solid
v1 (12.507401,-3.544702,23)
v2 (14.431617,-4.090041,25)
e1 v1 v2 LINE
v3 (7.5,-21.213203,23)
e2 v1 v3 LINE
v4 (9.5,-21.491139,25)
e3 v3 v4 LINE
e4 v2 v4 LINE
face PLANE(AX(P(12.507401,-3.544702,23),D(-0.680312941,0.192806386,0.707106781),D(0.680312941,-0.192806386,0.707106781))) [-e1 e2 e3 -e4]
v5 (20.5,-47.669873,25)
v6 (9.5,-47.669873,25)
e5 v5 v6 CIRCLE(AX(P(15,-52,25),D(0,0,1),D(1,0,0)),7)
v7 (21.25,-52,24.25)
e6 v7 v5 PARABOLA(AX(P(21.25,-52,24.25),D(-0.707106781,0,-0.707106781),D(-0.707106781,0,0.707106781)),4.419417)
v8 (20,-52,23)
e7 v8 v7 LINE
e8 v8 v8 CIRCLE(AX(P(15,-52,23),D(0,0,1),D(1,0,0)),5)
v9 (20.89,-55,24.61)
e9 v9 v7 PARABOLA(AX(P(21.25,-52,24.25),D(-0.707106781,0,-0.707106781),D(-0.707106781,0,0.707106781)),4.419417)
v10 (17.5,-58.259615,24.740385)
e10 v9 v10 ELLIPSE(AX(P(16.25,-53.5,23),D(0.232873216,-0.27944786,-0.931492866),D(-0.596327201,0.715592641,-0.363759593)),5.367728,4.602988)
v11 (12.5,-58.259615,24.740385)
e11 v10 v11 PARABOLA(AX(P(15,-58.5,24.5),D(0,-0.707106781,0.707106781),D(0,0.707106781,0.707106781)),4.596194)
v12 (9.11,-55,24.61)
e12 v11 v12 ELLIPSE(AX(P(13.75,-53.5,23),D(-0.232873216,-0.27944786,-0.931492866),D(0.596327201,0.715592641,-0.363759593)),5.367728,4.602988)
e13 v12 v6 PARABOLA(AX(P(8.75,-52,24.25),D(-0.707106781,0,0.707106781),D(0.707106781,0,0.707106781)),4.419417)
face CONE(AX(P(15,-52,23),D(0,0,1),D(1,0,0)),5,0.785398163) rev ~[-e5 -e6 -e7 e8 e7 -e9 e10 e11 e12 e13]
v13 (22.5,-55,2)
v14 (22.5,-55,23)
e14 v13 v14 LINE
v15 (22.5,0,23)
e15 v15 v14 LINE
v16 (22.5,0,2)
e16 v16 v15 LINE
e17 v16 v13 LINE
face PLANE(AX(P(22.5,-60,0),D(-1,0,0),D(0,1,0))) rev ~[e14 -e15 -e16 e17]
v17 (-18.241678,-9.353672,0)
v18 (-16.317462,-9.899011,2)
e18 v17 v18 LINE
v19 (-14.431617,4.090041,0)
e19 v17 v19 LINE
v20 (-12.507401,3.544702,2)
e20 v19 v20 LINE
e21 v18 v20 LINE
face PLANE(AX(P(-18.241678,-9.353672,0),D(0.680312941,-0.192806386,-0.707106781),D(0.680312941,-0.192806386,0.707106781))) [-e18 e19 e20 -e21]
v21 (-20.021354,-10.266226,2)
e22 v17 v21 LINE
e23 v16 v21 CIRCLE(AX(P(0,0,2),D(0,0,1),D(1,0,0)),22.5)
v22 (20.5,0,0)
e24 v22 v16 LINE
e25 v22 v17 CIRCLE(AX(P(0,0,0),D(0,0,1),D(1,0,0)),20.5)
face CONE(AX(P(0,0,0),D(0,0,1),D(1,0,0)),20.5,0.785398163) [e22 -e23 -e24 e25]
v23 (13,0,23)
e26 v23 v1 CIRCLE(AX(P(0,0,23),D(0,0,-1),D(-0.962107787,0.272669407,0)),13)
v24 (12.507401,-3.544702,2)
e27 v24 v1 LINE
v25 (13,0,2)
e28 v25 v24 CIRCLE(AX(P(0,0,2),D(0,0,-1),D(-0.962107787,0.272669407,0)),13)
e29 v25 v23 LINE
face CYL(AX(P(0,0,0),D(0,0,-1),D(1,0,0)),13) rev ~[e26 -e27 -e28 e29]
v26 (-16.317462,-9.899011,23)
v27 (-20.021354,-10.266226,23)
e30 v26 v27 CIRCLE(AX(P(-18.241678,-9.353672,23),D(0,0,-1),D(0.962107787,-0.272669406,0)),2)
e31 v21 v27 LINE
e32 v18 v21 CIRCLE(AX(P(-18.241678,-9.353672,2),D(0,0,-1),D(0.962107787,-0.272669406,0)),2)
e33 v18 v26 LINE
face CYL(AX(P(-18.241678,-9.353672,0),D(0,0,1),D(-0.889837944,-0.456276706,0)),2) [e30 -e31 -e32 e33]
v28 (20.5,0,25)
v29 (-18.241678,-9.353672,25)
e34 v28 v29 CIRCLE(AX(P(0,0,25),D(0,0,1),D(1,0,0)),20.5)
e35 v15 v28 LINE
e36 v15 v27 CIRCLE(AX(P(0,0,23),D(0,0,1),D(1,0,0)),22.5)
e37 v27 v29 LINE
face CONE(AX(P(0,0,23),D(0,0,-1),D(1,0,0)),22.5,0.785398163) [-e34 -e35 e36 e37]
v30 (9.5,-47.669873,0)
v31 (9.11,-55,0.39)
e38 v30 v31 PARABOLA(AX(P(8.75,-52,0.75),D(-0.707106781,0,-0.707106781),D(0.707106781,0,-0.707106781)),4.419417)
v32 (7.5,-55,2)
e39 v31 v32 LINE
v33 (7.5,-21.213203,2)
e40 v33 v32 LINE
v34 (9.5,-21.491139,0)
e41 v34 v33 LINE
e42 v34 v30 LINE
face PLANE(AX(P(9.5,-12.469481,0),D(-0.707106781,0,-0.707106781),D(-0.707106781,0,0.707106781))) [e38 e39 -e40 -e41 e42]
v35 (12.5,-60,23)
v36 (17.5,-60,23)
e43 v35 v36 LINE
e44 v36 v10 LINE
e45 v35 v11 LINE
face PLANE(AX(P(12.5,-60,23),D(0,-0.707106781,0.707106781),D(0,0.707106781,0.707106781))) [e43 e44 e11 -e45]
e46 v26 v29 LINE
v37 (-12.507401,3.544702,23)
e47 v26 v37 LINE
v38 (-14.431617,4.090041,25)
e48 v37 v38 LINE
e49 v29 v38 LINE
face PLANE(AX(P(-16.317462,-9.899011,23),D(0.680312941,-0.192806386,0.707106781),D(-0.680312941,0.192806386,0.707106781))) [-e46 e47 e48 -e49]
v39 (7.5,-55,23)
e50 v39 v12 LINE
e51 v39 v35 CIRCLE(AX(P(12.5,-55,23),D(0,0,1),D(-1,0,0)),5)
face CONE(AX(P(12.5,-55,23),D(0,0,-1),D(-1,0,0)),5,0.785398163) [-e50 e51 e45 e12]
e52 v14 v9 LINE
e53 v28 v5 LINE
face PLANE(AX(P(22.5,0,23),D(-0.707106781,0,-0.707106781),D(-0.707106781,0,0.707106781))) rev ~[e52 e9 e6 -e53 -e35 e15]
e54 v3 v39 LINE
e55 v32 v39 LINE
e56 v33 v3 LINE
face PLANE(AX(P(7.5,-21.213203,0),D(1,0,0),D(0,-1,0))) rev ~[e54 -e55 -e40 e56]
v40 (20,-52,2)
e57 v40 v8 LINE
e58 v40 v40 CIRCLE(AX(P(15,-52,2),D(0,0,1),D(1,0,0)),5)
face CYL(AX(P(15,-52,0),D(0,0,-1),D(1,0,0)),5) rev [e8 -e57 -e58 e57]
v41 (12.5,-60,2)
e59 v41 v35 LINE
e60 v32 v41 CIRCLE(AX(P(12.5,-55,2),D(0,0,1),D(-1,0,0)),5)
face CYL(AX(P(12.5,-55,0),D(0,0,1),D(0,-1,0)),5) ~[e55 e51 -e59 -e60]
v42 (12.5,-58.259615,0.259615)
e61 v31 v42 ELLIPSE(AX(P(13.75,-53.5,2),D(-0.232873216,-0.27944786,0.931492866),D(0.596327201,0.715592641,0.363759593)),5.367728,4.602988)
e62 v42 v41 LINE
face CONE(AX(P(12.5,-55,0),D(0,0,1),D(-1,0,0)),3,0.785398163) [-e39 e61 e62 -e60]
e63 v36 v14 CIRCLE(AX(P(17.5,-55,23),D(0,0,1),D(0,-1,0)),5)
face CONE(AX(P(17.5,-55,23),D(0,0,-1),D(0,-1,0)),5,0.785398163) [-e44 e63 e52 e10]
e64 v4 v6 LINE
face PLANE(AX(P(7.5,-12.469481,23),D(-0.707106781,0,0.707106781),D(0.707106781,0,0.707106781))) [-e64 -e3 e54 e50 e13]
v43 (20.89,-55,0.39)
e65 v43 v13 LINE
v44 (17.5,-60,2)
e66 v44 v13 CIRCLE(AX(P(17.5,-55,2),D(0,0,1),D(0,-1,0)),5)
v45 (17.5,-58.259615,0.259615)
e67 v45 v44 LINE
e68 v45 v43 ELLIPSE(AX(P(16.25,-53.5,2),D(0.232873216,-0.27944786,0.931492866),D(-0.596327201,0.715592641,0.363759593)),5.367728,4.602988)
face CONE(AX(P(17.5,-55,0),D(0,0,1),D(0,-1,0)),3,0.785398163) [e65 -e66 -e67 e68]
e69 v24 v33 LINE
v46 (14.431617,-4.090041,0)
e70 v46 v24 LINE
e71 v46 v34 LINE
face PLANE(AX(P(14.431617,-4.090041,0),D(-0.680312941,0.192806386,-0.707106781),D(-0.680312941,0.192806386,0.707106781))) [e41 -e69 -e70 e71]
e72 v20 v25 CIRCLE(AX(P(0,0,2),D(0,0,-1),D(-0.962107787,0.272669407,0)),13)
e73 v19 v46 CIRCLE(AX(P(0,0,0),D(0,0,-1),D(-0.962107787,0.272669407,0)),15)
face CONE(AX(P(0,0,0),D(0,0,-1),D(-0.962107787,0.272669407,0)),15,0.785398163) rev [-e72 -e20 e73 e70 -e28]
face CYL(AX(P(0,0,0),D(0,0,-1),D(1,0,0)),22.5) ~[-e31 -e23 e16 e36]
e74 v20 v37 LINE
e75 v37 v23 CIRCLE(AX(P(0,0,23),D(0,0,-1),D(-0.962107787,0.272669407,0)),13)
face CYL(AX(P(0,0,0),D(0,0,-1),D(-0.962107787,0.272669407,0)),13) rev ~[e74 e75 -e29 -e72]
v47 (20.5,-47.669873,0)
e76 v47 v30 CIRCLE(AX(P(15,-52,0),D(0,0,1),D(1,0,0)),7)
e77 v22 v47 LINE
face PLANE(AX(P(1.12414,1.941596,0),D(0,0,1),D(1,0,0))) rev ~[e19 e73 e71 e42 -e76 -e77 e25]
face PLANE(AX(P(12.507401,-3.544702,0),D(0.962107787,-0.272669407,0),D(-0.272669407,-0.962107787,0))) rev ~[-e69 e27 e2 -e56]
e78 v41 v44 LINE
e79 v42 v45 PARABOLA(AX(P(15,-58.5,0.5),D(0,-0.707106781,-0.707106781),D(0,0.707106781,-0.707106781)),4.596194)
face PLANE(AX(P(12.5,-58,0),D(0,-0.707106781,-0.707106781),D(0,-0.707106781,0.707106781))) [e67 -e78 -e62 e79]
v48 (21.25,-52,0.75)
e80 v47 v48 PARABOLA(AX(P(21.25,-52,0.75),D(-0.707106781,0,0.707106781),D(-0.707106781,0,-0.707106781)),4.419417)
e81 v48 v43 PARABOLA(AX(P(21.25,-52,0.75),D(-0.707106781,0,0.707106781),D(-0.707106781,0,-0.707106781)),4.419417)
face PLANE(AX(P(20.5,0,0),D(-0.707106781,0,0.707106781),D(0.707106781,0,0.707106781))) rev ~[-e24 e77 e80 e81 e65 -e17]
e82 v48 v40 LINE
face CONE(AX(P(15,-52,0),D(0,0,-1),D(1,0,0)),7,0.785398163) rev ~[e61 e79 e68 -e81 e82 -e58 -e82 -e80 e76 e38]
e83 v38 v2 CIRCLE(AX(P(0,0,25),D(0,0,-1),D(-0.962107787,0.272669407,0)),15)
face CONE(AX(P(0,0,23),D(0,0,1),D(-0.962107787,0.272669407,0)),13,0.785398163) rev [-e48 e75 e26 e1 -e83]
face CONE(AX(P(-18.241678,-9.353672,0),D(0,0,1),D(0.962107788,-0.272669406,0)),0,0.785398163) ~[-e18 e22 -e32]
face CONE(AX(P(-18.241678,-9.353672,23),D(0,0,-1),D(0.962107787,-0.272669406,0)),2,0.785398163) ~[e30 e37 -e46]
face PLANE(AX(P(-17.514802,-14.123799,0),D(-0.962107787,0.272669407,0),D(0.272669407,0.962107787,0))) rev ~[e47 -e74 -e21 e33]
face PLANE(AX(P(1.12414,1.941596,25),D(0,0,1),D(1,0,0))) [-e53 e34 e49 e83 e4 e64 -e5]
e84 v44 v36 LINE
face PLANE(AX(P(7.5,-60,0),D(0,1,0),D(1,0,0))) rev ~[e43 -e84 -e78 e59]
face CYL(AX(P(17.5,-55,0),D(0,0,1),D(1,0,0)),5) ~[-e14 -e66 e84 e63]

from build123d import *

# Parameters (mm, degrees)
F0_R         = 5
F1_DEPTH     = 25
F2_R         = 5
F3_R         = 2
F4_T1_DEPTH  = 13.9731886125
F4_T3_DEPTH  = 27.1080898313
F4_T5_DEPTH  = 55
F4_T7_DEPTH  = 42.5305187235
F4_T9_DEPTH  = 5
F4_T12_ANGLE = 137.0297160683
F4_T14_ANGLE = 180
F4_T16_ANGLE = 207.1471098896
F4_T18_ANGLE = 90
F4_T20_ANGLE = 90
F4_T24_ANGLE = 137.0297160683
F4_T26_ANGLE = 180
F4_T28_ANGLE = 207.1471098896
F4_T30_ANGLE = 90
F4_T32_ANGLE = 90


# Not quite as in the source:
# - a fillet or chamfer that OpenCascade refuses, or shapes differently, is made with other operations: its cross-section is extruded or revolved along the edge and cut away or added


with BuildPart() as f1:
    # F0 (on Top) → F1 (new body)
    with BuildSketch(Plane.XY):
        with BuildLine():
            ThreePointArc((7.5, -21.2132034356), (18.3711730709, -12.9903810568), (22.5, 0))
            ThreePointArc((22.5, 0), (-7.4888899158, 21.2171281711), (-17.5148024737, -14.1237988625))
            Line((-17.5148024737, -14.1237988625), (-12.5074012369, 3.5447022866))
            ThreePointArc((-12.5074012369, 3.5447022866), (1.7893831229, 12.8762614155), (13, 0))
            ThreePointArc((13, 0), (12.8762614155, -1.7893831229), (12.5074012369, -3.5447022866))
            Line((12.5074012369, -3.5447022866), (7.5, -21.2132034356))
        make_face()
        with BuildLine():
            Line((22.5, -60), (22.5, 0))
            ThreePointArc((22.5, 0), (18.3711730709, -12.9903810568), (7.5, -21.2132034356))
            Line((7.5, -21.2132034356), (7.5, -60))
            Line((7.5, -60), (22.5, -60))
        make_face()
        with Locations((15, -52)):
            Circle(F0_R, mode=Mode.SUBTRACT)
    extrude(amount=F1_DEPTH)

    # F2
    f2_edges = [f1.edges().sort_by_distance(p)[0] for p in [
        (22.5, -60, 12.5),
        (7.5, -60, 12.5),
    ]]
    fillet(f2_edges, radius=F2_R)

    # F3
    f3_edges = [f1.edges().sort_by_distance(p)[0] for p in [
        (-17.514802, -14.123799, 12.5),
    ]]
    fillet(f3_edges, radius=F3_R)

    # F4: chamfer of 2 on 22 edges, made by hand

    # F4_s2 → F4_t1 (cut)
    with BuildSketch(Plane(origin=(-3.8100610481, -13.4437135796, 0), x_dir=(0, 0, 1), z_dir=(0.2726694067, 0.9621077875, 0))):
        Polygon((23, -13), (25, -15), (25, -13), align=None)
        Polygon((0, -15), (2, -13), (0, -13), align=None)
    extrude(amount=F4_T1_DEPTH, mode=Mode.SUBTRACT)

    # F4_s4 → F4_t3 (cut)
    with BuildSketch(Plane(origin=(0, 0, 0), x_dir=(0, 0, 1), z_dir=(-0.2726694067, -0.9621077875, 0))):
        Polygon((23, -13), (25, -15), (25, -13), align=None)
        Polygon((0, -15), (2, -13), (0, -13), align=None)
    extrude(amount=F4_T3_DEPTH, mode=Mode.SUBTRACT)

    # F4_s6 → F4_t5 (cut)
    with BuildSketch(Plane.XZ):
        Polygon((22.5, 23), (20.5, 25), (22.5, 25), align=None)
        Polygon((20.5, 0), (22.5, 2), (22.5, 0), align=None)
    extrude(amount=F4_T5_DEPTH, mode=Mode.SUBTRACT)

    # F4_s8 → F4_t7 (cut)
    with BuildSketch(Plane.XZ.offset(12.4694812765)):
        Polygon((7.5, 23), (9.5, 25), (7.5, 25), align=None)
        Polygon((9.5, 0), (7.5, 2), (7.5, 0), align=None)
    extrude(amount=F4_T7_DEPTH, mode=Mode.SUBTRACT)

    # F4_s10 → F4_t9 (cut)
    with BuildSketch(Plane.YZ.offset(12.5)):
        Polygon((-60, 23), (-58, 25), (-60, 25), align=None)
        Polygon((-58, 0), (-60, 2), (-60, 0), align=None)
    extrude(amount=F4_T9_DEPTH, mode=Mode.SUBTRACT)

    # F4_s11 → F4_t12 (revolve, cut)
    with BuildSketch(Plane(origin=(-3.8100610481, -13.4437135796, 0), x_dir=(0, 0, 1), z_dir=(0.2726694067, 0.9621077875, 0))):
        Polygon((23, -13), (25, -15), (25, -13), align=None)
    revolve(axis=Axis((-18.2416778599, -9.3536724797, 25), (0, 0, -1)), revolution_arc=F4_T12_ANGLE, mode=Mode.SUBTRACT)

    # F4_s13 → F4_t14 (revolve, cut)
    with BuildSketch(Plane(origin=(0, 0, 0), x_dir=(0, 0, 1), z_dir=(-0.2726694067, -0.9621077875, 0))):
        Polygon((23, 13), (25, 15), (25, 13), align=None)
    revolve(axis=Axis((0, 0, 25), (0, 0, -1)), revolution_arc=F4_T14_ANGLE, mode=Mode.SUBTRACT)

    # F4_s15 → F4_t16 (revolve, cut)
    with BuildSketch(Plane.XZ):
        Polygon((22.5, 23), (20.5, 25), (22.5, 25), align=None)
    revolve(axis=Axis((0, 0, 25), (0, 0, 1)), revolution_arc=F4_T16_ANGLE, mode=Mode.SUBTRACT)

    # F4_s17 → F4_t18 (revolve, cut)
    with BuildSketch(Plane.YZ.offset(17.5)):
        Polygon((-60, 23), (-58, 25), (-60, 25), align=None)
    revolve(axis=Axis((17.5, -55, 25), (0, 0, 1)), revolution_arc=F4_T18_ANGLE, mode=Mode.SUBTRACT)

    # F4_s19 → F4_t20 (revolve, cut)
    with BuildSketch(Plane.XZ.offset(55)):
        Polygon((7.5, 23), (9.5, 25), (7.5, 25), align=None)
    revolve(axis=Axis((12.5, -55, 25), (0, 0, 1)), revolution_arc=F4_T20_ANGLE, mode=Mode.SUBTRACT)

    # F4_s21 → F4_t22 (revolve, cut)
    with BuildSketch(Plane.XZ.offset(52)):
        Polygon((20, 23), (22, 25), (20, 25), align=None)
    revolve(axis=Axis((15, -52, 25), (0, 0, 1)), mode=Mode.SUBTRACT)

    # F4_s23 → F4_t24 (revolve, cut)
    with BuildSketch(Plane(origin=(-3.8100610481, -13.4437135796, 0), x_dir=(0, 0, 1), z_dir=(0.2726694067, 0.9621077875, 0))):
        Polygon((0, -15), (2, -13), (0, -13), align=None)
    revolve(axis=Axis((-18.2416778599, -9.3536724797, 0), (0, 0, -1)), revolution_arc=F4_T24_ANGLE, mode=Mode.SUBTRACT)

    # F4_s25 → F4_t26 (revolve, cut)
    with BuildSketch(Plane(origin=(0, 0, 0), x_dir=(0, 0, 1), z_dir=(-0.2726694067, -0.9621077875, 0))):
        Polygon((0, 15), (2, 13), (0, 13), align=None)
    revolve(axis=Axis((0, 0, 0), (0, 0, -1)), revolution_arc=F4_T26_ANGLE, mode=Mode.SUBTRACT)

    # F4_s27 → F4_t28 (revolve, cut)
    with BuildSketch(Plane.XZ):
        Polygon((20.5, 0), (22.5, 2), (22.5, 0), align=None)
    revolve(axis=Axis((0, 0, 0), (0, 0, 1)), revolution_arc=F4_T28_ANGLE, mode=Mode.SUBTRACT)

    # F4_s29 → F4_t30 (revolve, cut)
    with BuildSketch(Plane.YZ.offset(17.5)):
        Polygon((-58, 0), (-60, 2), (-60, 0), align=None)
    revolve(axis=Axis((17.5, -55, 0), (0, 0, 1)), revolution_arc=F4_T30_ANGLE, mode=Mode.SUBTRACT)

    # F4_s31 → F4_t32 (revolve, cut)
    with BuildSketch(Plane.XZ.offset(55)):
        Polygon((9.5, 0), (7.5, 2), (7.5, 0), align=None)
    revolve(axis=Axis((12.5, -55, 0), (0, 0, 1)), revolution_arc=F4_T32_ANGLE, mode=Mode.SUBTRACT)

    # F4_s33 → F4_t34 (revolve, cut)
    with BuildSketch(Plane.XZ.offset(52)):
        Polygon((22, 0), (20, 2), (20, 0), align=None)
    revolve(axis=Axis((15, -52, 0), (0, 0, 1)), mode=Mode.SUBTRACT)


solid = f1.part
